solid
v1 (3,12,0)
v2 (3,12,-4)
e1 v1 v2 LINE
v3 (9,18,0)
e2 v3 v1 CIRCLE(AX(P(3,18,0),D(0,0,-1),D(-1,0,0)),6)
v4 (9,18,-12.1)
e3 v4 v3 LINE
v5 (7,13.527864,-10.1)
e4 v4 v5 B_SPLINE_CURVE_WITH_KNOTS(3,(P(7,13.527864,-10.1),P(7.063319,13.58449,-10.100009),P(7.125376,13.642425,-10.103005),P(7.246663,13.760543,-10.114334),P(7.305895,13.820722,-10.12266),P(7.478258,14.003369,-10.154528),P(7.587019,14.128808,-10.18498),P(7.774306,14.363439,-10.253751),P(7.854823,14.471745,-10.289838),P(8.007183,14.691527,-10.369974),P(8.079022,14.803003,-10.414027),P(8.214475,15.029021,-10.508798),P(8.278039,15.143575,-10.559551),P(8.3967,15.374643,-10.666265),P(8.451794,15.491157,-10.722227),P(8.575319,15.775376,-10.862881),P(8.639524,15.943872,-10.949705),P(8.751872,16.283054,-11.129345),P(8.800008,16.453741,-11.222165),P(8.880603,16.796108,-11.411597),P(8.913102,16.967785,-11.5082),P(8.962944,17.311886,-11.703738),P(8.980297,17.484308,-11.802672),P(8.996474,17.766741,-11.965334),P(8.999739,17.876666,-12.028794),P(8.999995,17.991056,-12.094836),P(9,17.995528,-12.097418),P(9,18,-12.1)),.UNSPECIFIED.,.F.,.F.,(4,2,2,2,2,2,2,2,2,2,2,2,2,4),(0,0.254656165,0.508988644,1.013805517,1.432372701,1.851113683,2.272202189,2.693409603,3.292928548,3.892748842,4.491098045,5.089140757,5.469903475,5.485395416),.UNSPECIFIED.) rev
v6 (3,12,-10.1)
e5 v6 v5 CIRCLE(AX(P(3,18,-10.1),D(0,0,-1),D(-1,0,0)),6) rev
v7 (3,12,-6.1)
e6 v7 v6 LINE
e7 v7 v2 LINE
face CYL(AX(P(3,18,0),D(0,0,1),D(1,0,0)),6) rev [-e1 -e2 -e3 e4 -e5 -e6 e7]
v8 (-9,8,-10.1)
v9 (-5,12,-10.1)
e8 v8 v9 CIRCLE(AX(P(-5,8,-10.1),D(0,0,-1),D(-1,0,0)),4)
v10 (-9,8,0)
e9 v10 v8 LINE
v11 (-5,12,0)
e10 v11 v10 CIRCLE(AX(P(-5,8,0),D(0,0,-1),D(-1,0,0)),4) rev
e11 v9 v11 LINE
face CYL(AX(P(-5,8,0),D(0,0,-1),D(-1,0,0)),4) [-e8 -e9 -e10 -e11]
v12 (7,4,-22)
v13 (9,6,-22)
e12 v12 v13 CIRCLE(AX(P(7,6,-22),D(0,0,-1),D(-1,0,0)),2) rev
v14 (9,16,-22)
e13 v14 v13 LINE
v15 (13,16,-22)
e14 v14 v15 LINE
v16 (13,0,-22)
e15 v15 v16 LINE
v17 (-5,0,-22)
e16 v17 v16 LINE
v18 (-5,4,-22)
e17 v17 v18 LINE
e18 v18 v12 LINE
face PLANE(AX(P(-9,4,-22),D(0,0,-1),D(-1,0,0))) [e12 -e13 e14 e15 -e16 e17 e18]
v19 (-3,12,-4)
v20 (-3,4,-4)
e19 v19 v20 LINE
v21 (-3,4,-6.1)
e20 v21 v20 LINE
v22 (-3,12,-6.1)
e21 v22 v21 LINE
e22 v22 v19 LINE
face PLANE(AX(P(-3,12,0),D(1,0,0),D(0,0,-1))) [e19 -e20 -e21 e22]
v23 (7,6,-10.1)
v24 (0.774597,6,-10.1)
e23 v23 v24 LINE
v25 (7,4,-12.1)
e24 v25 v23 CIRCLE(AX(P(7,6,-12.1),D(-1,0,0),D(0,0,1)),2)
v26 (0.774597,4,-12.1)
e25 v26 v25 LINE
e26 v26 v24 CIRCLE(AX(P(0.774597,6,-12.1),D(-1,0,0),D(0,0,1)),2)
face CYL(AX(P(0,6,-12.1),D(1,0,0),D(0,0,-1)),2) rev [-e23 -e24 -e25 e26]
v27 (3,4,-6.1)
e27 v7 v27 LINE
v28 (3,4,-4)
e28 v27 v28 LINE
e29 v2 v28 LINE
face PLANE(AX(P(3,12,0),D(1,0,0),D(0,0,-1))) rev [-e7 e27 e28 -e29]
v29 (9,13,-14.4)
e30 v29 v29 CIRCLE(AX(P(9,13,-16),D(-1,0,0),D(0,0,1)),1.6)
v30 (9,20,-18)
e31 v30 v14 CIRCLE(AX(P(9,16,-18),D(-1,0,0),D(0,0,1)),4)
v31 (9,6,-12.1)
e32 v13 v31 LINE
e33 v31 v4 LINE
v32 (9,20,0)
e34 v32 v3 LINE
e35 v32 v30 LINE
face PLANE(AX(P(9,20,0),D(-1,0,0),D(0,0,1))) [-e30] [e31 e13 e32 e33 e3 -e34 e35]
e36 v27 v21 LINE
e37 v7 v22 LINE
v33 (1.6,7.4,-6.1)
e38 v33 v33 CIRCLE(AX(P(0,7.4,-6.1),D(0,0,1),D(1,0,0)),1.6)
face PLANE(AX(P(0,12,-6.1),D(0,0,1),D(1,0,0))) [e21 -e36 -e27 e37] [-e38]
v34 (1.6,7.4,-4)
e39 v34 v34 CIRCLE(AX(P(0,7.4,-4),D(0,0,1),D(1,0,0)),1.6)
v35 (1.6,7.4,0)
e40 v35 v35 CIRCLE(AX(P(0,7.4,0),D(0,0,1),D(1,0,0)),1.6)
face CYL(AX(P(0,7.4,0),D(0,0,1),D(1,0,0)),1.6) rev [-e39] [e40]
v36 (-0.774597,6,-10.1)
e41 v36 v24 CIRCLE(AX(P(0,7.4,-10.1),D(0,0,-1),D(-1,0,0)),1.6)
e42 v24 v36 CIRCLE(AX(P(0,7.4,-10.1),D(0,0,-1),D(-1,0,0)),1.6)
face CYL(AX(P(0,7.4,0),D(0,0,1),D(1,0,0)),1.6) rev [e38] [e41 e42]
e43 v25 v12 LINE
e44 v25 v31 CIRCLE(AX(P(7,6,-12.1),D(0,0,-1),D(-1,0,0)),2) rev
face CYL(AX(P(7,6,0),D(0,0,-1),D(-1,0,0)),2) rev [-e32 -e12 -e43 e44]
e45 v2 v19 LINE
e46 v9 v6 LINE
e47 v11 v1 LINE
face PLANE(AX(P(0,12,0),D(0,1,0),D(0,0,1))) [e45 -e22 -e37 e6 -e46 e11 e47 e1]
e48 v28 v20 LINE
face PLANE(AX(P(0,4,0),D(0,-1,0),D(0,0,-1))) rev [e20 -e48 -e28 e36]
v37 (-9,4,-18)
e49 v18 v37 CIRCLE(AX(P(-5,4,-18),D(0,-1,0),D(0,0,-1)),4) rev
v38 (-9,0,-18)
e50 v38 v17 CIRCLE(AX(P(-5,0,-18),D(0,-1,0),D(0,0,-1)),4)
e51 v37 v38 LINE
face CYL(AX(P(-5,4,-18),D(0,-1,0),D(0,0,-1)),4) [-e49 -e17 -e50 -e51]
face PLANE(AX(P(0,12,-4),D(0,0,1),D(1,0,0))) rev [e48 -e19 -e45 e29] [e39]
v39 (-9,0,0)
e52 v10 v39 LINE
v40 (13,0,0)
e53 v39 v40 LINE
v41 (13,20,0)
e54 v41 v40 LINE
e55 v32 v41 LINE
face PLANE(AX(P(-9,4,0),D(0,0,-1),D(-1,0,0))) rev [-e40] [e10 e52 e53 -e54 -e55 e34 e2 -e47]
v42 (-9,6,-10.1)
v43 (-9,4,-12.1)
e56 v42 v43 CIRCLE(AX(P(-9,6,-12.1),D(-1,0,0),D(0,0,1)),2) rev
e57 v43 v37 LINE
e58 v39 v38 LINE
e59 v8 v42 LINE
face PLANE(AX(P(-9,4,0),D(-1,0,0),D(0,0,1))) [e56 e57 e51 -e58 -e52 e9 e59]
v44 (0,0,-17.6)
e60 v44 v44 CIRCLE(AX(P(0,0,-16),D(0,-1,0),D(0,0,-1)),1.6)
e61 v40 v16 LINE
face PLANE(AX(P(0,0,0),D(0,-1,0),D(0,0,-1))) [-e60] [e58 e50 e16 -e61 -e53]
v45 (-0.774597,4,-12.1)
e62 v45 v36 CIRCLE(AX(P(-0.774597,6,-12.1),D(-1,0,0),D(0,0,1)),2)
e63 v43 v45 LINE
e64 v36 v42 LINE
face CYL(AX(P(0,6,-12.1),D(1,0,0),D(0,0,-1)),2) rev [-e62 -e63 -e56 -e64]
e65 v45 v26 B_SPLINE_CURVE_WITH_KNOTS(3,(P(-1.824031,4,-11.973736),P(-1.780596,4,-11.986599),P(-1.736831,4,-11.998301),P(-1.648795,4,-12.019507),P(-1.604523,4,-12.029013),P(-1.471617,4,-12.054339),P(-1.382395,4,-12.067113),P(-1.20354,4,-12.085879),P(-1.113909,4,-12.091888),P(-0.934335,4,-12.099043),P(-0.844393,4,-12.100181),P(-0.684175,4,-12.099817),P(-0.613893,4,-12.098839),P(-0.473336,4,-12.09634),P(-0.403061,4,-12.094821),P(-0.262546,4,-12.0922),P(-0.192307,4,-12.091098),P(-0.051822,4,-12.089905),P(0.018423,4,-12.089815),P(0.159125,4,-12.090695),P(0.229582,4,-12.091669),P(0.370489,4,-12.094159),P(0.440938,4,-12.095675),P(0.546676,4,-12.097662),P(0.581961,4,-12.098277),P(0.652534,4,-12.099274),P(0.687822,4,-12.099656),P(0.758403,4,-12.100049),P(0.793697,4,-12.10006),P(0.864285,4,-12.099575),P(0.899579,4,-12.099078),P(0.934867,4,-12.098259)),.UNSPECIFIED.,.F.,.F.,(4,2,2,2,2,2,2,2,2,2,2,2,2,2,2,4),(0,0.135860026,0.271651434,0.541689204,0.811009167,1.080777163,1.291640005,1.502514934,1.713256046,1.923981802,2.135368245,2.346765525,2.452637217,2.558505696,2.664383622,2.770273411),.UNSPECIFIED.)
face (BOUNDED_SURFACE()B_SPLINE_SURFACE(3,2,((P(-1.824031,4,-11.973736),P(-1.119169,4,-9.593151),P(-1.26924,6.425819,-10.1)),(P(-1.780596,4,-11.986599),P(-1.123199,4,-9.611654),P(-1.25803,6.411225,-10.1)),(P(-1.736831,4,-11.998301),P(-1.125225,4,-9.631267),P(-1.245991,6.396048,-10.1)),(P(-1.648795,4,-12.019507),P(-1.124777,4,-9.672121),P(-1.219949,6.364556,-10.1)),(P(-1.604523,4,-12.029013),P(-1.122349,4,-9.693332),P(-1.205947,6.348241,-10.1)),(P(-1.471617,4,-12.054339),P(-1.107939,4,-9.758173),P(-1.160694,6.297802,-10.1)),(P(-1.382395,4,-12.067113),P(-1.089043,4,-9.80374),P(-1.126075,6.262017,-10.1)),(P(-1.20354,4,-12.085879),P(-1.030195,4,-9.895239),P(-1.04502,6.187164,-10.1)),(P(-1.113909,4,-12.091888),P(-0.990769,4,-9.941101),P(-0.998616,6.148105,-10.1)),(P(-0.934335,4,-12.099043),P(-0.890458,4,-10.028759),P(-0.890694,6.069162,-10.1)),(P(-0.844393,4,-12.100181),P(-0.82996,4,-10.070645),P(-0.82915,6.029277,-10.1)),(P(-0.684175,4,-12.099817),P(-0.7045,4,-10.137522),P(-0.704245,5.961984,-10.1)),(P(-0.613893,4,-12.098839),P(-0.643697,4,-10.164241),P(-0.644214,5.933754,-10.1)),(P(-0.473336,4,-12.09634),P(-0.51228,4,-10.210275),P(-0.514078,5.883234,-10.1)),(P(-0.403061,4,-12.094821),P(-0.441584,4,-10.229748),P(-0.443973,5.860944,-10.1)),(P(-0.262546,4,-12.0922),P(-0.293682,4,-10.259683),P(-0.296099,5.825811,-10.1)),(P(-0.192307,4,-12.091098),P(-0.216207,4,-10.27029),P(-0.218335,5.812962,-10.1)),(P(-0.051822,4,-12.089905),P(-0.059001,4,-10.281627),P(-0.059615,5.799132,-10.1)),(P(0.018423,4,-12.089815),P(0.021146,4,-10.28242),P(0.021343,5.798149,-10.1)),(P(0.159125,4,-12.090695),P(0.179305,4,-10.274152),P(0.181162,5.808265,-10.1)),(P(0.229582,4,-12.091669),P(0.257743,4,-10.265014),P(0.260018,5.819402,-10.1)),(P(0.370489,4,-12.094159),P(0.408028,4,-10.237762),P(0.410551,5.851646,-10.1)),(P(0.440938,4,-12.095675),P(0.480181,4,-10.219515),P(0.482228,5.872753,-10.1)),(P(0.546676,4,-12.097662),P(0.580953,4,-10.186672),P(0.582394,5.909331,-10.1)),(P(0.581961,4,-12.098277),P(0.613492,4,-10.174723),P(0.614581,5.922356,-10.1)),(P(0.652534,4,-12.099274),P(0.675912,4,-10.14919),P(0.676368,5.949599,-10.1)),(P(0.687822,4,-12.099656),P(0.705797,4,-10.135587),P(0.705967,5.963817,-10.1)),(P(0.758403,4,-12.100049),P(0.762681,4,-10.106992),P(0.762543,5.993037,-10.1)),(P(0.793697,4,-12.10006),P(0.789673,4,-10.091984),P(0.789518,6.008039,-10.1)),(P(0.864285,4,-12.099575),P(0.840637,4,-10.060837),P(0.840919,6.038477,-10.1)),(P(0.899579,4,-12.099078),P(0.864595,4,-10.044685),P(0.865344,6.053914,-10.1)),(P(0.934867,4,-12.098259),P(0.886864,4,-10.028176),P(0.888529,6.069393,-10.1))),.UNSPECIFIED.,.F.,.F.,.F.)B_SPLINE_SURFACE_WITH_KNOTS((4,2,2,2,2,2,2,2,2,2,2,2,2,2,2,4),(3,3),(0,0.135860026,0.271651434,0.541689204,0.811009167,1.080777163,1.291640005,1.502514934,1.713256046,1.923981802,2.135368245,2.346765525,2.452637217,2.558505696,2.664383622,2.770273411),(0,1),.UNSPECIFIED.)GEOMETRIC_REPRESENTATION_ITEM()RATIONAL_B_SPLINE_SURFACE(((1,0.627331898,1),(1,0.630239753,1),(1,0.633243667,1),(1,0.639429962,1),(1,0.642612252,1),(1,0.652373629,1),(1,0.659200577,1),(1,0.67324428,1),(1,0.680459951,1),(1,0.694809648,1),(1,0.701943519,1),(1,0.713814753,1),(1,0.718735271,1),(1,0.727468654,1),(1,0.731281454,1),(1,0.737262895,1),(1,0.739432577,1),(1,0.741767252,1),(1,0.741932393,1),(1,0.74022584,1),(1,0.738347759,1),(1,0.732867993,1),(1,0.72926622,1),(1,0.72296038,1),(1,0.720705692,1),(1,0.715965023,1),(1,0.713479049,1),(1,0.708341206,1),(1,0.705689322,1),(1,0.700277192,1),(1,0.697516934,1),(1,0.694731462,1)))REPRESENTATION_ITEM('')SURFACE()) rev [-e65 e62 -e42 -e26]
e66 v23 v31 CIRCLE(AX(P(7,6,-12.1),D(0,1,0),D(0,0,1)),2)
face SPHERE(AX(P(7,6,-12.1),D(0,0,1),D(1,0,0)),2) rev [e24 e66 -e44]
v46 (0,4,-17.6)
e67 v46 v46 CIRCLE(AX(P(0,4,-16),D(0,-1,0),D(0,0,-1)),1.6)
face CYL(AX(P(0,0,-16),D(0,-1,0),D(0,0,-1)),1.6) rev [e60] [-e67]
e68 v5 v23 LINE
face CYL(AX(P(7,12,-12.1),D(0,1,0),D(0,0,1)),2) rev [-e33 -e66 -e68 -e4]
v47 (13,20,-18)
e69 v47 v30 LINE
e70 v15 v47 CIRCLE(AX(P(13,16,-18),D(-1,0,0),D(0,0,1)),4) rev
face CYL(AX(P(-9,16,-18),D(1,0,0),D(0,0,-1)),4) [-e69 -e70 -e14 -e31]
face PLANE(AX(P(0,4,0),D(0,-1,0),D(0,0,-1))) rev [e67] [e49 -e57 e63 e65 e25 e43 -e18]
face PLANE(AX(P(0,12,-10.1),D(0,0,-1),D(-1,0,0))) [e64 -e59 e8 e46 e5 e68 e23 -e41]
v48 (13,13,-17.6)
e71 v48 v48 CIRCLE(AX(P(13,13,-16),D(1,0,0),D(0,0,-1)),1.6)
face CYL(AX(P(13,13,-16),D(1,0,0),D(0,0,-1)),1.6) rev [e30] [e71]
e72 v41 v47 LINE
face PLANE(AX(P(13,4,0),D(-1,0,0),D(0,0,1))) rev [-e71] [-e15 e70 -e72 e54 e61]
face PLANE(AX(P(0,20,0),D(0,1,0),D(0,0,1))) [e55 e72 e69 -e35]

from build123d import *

# Parameters (mm, degrees)
SKETCH2_W                         = 18
SKETCH2_H                         = 22
SKETCH2_W_2                       = 4
BOSS_EXTRUDE1_DEPTH               = 4
SKETCH2_4_W                       = 18
SKETCH2_4_H                       = 10.1
SKETCH2_4_W_2                     = 6
SKETCH2_4_H_2                     = 2.1
BOSS_EXTRUDE2_DEPTH               = 12
SKETCH2_5_W                       = 4
SKETCH2_5_H                       = 22
BOSS_EXTRUDE3_DEPTH               = 20
F_3_2_3_2_MOUNT_HOLES_D           = 3.2
F_3_2_3_2_MOUNT_HOLES_ON_FACE_2_D = 3.2
F_3_2_3_2_MOUNT_HOLES_ON_FACE_3_D = 3.2
FILLET2_R                         = 6
FILLET1_R                         = 2
FILLET3_R                         = 4


with BuildPart() as part:
    # Sketch2 → Boss-Extrude1 (new body)
    with BuildSketch(Plane(origin=(0, 0, 0), x_dir=(1, 0, 0), z_dir=(0, 1, 0))):
        with Locations((0, 11)):
            Rectangle(SKETCH2_W, SKETCH2_H)
        with Locations((11, 11)):
            Rectangle(SKETCH2_W_2, SKETCH2_H)
    extrude(amount=BOSS_EXTRUDE1_DEPTH)

    # Sketch2<4> → Boss-Extrude2 (add)
    with BuildSketch(Plane(origin=(0, 0, 0), x_dir=(1, 0, 0), z_dir=(0, 1, 0))):
        with Locations((0, 5.05)):
            Rectangle(SKETCH2_4_W, SKETCH2_4_H)
        with Locations((0, 5.05)):
            Rectangle(SKETCH2_4_W_2, SKETCH2_4_H_2, mode=Mode.SUBTRACT)
    extrude(amount=BOSS_EXTRUDE2_DEPTH)

    # Sketch2<5> → Boss-Extrude3 (add)
    with BuildSketch(Plane(origin=(0, 0, 0), x_dir=(1, 0, 0), z_dir=(0, 1, 0))):
        with Locations((11, 11)):
            Rectangle(SKETCH2_5_W, SKETCH2_5_H)
    extrude(amount=BOSS_EXTRUDE3_DEPTH)

    # Ø3.2 (3.2) Mount Holes (through all)
    with Locations(Plane(origin=(0, 7.4, 0), x_dir=(1, 0, 0), z_dir=(0, 0, 1))):
        with Locations((0, 0)):
            Hole(F_3_2_3_2_MOUNT_HOLES_D / 2)

    # Ø3.2 (3.2) Mount Holes on face 2 (through all)
    with Locations(Plane(origin=(0, 0, -16), x_dir=(0, 0, -1), z_dir=(0, -1, 0))):
        with Locations((0, 0)):
            Hole(F_3_2_3_2_MOUNT_HOLES_ON_FACE_2_D / 2)

    # Ø3.2 (3.2) Mount Holes on face 3 (through all)
    with Locations(Plane(origin=(13, 13, -16), x_dir=(0, 0, 1), z_dir=(1, 0, 0))):
        with Locations((0, 0)):
            Hole(F_3_2_3_2_MOUNT_HOLES_ON_FACE_3_D / 2)

    # Fillet2
    fillet2_edges = [part.edges().sort_by_distance(p)[0] for p in [
        (9, 12, -5.05),
    ]]
    fillet(fillet2_edges, radius=FILLET2_R - 0.0001)  # a hair under: the kernel refuses the full size

    # Fillet1
    fillet1_edges = [part.edges().sort_by_distance(p)[0] for p in [
        (9, 10.99995, -10.1),
        (0, 4, -10.1),
        (9, 4, -16.05),
    ]]
    fillet(fillet1_edges, radius=FILLET1_R)

    # Fillet3
    fillet3_edges = [part.edges().sort_by_distance(p)[0] for p in [
        (-9, 12, -5.05),
        (11, 20, -22),
        (-9, 2, -22),
    ]]
    fillet(fillet3_edges, radius=FILLET3_R)


solid = part.part
